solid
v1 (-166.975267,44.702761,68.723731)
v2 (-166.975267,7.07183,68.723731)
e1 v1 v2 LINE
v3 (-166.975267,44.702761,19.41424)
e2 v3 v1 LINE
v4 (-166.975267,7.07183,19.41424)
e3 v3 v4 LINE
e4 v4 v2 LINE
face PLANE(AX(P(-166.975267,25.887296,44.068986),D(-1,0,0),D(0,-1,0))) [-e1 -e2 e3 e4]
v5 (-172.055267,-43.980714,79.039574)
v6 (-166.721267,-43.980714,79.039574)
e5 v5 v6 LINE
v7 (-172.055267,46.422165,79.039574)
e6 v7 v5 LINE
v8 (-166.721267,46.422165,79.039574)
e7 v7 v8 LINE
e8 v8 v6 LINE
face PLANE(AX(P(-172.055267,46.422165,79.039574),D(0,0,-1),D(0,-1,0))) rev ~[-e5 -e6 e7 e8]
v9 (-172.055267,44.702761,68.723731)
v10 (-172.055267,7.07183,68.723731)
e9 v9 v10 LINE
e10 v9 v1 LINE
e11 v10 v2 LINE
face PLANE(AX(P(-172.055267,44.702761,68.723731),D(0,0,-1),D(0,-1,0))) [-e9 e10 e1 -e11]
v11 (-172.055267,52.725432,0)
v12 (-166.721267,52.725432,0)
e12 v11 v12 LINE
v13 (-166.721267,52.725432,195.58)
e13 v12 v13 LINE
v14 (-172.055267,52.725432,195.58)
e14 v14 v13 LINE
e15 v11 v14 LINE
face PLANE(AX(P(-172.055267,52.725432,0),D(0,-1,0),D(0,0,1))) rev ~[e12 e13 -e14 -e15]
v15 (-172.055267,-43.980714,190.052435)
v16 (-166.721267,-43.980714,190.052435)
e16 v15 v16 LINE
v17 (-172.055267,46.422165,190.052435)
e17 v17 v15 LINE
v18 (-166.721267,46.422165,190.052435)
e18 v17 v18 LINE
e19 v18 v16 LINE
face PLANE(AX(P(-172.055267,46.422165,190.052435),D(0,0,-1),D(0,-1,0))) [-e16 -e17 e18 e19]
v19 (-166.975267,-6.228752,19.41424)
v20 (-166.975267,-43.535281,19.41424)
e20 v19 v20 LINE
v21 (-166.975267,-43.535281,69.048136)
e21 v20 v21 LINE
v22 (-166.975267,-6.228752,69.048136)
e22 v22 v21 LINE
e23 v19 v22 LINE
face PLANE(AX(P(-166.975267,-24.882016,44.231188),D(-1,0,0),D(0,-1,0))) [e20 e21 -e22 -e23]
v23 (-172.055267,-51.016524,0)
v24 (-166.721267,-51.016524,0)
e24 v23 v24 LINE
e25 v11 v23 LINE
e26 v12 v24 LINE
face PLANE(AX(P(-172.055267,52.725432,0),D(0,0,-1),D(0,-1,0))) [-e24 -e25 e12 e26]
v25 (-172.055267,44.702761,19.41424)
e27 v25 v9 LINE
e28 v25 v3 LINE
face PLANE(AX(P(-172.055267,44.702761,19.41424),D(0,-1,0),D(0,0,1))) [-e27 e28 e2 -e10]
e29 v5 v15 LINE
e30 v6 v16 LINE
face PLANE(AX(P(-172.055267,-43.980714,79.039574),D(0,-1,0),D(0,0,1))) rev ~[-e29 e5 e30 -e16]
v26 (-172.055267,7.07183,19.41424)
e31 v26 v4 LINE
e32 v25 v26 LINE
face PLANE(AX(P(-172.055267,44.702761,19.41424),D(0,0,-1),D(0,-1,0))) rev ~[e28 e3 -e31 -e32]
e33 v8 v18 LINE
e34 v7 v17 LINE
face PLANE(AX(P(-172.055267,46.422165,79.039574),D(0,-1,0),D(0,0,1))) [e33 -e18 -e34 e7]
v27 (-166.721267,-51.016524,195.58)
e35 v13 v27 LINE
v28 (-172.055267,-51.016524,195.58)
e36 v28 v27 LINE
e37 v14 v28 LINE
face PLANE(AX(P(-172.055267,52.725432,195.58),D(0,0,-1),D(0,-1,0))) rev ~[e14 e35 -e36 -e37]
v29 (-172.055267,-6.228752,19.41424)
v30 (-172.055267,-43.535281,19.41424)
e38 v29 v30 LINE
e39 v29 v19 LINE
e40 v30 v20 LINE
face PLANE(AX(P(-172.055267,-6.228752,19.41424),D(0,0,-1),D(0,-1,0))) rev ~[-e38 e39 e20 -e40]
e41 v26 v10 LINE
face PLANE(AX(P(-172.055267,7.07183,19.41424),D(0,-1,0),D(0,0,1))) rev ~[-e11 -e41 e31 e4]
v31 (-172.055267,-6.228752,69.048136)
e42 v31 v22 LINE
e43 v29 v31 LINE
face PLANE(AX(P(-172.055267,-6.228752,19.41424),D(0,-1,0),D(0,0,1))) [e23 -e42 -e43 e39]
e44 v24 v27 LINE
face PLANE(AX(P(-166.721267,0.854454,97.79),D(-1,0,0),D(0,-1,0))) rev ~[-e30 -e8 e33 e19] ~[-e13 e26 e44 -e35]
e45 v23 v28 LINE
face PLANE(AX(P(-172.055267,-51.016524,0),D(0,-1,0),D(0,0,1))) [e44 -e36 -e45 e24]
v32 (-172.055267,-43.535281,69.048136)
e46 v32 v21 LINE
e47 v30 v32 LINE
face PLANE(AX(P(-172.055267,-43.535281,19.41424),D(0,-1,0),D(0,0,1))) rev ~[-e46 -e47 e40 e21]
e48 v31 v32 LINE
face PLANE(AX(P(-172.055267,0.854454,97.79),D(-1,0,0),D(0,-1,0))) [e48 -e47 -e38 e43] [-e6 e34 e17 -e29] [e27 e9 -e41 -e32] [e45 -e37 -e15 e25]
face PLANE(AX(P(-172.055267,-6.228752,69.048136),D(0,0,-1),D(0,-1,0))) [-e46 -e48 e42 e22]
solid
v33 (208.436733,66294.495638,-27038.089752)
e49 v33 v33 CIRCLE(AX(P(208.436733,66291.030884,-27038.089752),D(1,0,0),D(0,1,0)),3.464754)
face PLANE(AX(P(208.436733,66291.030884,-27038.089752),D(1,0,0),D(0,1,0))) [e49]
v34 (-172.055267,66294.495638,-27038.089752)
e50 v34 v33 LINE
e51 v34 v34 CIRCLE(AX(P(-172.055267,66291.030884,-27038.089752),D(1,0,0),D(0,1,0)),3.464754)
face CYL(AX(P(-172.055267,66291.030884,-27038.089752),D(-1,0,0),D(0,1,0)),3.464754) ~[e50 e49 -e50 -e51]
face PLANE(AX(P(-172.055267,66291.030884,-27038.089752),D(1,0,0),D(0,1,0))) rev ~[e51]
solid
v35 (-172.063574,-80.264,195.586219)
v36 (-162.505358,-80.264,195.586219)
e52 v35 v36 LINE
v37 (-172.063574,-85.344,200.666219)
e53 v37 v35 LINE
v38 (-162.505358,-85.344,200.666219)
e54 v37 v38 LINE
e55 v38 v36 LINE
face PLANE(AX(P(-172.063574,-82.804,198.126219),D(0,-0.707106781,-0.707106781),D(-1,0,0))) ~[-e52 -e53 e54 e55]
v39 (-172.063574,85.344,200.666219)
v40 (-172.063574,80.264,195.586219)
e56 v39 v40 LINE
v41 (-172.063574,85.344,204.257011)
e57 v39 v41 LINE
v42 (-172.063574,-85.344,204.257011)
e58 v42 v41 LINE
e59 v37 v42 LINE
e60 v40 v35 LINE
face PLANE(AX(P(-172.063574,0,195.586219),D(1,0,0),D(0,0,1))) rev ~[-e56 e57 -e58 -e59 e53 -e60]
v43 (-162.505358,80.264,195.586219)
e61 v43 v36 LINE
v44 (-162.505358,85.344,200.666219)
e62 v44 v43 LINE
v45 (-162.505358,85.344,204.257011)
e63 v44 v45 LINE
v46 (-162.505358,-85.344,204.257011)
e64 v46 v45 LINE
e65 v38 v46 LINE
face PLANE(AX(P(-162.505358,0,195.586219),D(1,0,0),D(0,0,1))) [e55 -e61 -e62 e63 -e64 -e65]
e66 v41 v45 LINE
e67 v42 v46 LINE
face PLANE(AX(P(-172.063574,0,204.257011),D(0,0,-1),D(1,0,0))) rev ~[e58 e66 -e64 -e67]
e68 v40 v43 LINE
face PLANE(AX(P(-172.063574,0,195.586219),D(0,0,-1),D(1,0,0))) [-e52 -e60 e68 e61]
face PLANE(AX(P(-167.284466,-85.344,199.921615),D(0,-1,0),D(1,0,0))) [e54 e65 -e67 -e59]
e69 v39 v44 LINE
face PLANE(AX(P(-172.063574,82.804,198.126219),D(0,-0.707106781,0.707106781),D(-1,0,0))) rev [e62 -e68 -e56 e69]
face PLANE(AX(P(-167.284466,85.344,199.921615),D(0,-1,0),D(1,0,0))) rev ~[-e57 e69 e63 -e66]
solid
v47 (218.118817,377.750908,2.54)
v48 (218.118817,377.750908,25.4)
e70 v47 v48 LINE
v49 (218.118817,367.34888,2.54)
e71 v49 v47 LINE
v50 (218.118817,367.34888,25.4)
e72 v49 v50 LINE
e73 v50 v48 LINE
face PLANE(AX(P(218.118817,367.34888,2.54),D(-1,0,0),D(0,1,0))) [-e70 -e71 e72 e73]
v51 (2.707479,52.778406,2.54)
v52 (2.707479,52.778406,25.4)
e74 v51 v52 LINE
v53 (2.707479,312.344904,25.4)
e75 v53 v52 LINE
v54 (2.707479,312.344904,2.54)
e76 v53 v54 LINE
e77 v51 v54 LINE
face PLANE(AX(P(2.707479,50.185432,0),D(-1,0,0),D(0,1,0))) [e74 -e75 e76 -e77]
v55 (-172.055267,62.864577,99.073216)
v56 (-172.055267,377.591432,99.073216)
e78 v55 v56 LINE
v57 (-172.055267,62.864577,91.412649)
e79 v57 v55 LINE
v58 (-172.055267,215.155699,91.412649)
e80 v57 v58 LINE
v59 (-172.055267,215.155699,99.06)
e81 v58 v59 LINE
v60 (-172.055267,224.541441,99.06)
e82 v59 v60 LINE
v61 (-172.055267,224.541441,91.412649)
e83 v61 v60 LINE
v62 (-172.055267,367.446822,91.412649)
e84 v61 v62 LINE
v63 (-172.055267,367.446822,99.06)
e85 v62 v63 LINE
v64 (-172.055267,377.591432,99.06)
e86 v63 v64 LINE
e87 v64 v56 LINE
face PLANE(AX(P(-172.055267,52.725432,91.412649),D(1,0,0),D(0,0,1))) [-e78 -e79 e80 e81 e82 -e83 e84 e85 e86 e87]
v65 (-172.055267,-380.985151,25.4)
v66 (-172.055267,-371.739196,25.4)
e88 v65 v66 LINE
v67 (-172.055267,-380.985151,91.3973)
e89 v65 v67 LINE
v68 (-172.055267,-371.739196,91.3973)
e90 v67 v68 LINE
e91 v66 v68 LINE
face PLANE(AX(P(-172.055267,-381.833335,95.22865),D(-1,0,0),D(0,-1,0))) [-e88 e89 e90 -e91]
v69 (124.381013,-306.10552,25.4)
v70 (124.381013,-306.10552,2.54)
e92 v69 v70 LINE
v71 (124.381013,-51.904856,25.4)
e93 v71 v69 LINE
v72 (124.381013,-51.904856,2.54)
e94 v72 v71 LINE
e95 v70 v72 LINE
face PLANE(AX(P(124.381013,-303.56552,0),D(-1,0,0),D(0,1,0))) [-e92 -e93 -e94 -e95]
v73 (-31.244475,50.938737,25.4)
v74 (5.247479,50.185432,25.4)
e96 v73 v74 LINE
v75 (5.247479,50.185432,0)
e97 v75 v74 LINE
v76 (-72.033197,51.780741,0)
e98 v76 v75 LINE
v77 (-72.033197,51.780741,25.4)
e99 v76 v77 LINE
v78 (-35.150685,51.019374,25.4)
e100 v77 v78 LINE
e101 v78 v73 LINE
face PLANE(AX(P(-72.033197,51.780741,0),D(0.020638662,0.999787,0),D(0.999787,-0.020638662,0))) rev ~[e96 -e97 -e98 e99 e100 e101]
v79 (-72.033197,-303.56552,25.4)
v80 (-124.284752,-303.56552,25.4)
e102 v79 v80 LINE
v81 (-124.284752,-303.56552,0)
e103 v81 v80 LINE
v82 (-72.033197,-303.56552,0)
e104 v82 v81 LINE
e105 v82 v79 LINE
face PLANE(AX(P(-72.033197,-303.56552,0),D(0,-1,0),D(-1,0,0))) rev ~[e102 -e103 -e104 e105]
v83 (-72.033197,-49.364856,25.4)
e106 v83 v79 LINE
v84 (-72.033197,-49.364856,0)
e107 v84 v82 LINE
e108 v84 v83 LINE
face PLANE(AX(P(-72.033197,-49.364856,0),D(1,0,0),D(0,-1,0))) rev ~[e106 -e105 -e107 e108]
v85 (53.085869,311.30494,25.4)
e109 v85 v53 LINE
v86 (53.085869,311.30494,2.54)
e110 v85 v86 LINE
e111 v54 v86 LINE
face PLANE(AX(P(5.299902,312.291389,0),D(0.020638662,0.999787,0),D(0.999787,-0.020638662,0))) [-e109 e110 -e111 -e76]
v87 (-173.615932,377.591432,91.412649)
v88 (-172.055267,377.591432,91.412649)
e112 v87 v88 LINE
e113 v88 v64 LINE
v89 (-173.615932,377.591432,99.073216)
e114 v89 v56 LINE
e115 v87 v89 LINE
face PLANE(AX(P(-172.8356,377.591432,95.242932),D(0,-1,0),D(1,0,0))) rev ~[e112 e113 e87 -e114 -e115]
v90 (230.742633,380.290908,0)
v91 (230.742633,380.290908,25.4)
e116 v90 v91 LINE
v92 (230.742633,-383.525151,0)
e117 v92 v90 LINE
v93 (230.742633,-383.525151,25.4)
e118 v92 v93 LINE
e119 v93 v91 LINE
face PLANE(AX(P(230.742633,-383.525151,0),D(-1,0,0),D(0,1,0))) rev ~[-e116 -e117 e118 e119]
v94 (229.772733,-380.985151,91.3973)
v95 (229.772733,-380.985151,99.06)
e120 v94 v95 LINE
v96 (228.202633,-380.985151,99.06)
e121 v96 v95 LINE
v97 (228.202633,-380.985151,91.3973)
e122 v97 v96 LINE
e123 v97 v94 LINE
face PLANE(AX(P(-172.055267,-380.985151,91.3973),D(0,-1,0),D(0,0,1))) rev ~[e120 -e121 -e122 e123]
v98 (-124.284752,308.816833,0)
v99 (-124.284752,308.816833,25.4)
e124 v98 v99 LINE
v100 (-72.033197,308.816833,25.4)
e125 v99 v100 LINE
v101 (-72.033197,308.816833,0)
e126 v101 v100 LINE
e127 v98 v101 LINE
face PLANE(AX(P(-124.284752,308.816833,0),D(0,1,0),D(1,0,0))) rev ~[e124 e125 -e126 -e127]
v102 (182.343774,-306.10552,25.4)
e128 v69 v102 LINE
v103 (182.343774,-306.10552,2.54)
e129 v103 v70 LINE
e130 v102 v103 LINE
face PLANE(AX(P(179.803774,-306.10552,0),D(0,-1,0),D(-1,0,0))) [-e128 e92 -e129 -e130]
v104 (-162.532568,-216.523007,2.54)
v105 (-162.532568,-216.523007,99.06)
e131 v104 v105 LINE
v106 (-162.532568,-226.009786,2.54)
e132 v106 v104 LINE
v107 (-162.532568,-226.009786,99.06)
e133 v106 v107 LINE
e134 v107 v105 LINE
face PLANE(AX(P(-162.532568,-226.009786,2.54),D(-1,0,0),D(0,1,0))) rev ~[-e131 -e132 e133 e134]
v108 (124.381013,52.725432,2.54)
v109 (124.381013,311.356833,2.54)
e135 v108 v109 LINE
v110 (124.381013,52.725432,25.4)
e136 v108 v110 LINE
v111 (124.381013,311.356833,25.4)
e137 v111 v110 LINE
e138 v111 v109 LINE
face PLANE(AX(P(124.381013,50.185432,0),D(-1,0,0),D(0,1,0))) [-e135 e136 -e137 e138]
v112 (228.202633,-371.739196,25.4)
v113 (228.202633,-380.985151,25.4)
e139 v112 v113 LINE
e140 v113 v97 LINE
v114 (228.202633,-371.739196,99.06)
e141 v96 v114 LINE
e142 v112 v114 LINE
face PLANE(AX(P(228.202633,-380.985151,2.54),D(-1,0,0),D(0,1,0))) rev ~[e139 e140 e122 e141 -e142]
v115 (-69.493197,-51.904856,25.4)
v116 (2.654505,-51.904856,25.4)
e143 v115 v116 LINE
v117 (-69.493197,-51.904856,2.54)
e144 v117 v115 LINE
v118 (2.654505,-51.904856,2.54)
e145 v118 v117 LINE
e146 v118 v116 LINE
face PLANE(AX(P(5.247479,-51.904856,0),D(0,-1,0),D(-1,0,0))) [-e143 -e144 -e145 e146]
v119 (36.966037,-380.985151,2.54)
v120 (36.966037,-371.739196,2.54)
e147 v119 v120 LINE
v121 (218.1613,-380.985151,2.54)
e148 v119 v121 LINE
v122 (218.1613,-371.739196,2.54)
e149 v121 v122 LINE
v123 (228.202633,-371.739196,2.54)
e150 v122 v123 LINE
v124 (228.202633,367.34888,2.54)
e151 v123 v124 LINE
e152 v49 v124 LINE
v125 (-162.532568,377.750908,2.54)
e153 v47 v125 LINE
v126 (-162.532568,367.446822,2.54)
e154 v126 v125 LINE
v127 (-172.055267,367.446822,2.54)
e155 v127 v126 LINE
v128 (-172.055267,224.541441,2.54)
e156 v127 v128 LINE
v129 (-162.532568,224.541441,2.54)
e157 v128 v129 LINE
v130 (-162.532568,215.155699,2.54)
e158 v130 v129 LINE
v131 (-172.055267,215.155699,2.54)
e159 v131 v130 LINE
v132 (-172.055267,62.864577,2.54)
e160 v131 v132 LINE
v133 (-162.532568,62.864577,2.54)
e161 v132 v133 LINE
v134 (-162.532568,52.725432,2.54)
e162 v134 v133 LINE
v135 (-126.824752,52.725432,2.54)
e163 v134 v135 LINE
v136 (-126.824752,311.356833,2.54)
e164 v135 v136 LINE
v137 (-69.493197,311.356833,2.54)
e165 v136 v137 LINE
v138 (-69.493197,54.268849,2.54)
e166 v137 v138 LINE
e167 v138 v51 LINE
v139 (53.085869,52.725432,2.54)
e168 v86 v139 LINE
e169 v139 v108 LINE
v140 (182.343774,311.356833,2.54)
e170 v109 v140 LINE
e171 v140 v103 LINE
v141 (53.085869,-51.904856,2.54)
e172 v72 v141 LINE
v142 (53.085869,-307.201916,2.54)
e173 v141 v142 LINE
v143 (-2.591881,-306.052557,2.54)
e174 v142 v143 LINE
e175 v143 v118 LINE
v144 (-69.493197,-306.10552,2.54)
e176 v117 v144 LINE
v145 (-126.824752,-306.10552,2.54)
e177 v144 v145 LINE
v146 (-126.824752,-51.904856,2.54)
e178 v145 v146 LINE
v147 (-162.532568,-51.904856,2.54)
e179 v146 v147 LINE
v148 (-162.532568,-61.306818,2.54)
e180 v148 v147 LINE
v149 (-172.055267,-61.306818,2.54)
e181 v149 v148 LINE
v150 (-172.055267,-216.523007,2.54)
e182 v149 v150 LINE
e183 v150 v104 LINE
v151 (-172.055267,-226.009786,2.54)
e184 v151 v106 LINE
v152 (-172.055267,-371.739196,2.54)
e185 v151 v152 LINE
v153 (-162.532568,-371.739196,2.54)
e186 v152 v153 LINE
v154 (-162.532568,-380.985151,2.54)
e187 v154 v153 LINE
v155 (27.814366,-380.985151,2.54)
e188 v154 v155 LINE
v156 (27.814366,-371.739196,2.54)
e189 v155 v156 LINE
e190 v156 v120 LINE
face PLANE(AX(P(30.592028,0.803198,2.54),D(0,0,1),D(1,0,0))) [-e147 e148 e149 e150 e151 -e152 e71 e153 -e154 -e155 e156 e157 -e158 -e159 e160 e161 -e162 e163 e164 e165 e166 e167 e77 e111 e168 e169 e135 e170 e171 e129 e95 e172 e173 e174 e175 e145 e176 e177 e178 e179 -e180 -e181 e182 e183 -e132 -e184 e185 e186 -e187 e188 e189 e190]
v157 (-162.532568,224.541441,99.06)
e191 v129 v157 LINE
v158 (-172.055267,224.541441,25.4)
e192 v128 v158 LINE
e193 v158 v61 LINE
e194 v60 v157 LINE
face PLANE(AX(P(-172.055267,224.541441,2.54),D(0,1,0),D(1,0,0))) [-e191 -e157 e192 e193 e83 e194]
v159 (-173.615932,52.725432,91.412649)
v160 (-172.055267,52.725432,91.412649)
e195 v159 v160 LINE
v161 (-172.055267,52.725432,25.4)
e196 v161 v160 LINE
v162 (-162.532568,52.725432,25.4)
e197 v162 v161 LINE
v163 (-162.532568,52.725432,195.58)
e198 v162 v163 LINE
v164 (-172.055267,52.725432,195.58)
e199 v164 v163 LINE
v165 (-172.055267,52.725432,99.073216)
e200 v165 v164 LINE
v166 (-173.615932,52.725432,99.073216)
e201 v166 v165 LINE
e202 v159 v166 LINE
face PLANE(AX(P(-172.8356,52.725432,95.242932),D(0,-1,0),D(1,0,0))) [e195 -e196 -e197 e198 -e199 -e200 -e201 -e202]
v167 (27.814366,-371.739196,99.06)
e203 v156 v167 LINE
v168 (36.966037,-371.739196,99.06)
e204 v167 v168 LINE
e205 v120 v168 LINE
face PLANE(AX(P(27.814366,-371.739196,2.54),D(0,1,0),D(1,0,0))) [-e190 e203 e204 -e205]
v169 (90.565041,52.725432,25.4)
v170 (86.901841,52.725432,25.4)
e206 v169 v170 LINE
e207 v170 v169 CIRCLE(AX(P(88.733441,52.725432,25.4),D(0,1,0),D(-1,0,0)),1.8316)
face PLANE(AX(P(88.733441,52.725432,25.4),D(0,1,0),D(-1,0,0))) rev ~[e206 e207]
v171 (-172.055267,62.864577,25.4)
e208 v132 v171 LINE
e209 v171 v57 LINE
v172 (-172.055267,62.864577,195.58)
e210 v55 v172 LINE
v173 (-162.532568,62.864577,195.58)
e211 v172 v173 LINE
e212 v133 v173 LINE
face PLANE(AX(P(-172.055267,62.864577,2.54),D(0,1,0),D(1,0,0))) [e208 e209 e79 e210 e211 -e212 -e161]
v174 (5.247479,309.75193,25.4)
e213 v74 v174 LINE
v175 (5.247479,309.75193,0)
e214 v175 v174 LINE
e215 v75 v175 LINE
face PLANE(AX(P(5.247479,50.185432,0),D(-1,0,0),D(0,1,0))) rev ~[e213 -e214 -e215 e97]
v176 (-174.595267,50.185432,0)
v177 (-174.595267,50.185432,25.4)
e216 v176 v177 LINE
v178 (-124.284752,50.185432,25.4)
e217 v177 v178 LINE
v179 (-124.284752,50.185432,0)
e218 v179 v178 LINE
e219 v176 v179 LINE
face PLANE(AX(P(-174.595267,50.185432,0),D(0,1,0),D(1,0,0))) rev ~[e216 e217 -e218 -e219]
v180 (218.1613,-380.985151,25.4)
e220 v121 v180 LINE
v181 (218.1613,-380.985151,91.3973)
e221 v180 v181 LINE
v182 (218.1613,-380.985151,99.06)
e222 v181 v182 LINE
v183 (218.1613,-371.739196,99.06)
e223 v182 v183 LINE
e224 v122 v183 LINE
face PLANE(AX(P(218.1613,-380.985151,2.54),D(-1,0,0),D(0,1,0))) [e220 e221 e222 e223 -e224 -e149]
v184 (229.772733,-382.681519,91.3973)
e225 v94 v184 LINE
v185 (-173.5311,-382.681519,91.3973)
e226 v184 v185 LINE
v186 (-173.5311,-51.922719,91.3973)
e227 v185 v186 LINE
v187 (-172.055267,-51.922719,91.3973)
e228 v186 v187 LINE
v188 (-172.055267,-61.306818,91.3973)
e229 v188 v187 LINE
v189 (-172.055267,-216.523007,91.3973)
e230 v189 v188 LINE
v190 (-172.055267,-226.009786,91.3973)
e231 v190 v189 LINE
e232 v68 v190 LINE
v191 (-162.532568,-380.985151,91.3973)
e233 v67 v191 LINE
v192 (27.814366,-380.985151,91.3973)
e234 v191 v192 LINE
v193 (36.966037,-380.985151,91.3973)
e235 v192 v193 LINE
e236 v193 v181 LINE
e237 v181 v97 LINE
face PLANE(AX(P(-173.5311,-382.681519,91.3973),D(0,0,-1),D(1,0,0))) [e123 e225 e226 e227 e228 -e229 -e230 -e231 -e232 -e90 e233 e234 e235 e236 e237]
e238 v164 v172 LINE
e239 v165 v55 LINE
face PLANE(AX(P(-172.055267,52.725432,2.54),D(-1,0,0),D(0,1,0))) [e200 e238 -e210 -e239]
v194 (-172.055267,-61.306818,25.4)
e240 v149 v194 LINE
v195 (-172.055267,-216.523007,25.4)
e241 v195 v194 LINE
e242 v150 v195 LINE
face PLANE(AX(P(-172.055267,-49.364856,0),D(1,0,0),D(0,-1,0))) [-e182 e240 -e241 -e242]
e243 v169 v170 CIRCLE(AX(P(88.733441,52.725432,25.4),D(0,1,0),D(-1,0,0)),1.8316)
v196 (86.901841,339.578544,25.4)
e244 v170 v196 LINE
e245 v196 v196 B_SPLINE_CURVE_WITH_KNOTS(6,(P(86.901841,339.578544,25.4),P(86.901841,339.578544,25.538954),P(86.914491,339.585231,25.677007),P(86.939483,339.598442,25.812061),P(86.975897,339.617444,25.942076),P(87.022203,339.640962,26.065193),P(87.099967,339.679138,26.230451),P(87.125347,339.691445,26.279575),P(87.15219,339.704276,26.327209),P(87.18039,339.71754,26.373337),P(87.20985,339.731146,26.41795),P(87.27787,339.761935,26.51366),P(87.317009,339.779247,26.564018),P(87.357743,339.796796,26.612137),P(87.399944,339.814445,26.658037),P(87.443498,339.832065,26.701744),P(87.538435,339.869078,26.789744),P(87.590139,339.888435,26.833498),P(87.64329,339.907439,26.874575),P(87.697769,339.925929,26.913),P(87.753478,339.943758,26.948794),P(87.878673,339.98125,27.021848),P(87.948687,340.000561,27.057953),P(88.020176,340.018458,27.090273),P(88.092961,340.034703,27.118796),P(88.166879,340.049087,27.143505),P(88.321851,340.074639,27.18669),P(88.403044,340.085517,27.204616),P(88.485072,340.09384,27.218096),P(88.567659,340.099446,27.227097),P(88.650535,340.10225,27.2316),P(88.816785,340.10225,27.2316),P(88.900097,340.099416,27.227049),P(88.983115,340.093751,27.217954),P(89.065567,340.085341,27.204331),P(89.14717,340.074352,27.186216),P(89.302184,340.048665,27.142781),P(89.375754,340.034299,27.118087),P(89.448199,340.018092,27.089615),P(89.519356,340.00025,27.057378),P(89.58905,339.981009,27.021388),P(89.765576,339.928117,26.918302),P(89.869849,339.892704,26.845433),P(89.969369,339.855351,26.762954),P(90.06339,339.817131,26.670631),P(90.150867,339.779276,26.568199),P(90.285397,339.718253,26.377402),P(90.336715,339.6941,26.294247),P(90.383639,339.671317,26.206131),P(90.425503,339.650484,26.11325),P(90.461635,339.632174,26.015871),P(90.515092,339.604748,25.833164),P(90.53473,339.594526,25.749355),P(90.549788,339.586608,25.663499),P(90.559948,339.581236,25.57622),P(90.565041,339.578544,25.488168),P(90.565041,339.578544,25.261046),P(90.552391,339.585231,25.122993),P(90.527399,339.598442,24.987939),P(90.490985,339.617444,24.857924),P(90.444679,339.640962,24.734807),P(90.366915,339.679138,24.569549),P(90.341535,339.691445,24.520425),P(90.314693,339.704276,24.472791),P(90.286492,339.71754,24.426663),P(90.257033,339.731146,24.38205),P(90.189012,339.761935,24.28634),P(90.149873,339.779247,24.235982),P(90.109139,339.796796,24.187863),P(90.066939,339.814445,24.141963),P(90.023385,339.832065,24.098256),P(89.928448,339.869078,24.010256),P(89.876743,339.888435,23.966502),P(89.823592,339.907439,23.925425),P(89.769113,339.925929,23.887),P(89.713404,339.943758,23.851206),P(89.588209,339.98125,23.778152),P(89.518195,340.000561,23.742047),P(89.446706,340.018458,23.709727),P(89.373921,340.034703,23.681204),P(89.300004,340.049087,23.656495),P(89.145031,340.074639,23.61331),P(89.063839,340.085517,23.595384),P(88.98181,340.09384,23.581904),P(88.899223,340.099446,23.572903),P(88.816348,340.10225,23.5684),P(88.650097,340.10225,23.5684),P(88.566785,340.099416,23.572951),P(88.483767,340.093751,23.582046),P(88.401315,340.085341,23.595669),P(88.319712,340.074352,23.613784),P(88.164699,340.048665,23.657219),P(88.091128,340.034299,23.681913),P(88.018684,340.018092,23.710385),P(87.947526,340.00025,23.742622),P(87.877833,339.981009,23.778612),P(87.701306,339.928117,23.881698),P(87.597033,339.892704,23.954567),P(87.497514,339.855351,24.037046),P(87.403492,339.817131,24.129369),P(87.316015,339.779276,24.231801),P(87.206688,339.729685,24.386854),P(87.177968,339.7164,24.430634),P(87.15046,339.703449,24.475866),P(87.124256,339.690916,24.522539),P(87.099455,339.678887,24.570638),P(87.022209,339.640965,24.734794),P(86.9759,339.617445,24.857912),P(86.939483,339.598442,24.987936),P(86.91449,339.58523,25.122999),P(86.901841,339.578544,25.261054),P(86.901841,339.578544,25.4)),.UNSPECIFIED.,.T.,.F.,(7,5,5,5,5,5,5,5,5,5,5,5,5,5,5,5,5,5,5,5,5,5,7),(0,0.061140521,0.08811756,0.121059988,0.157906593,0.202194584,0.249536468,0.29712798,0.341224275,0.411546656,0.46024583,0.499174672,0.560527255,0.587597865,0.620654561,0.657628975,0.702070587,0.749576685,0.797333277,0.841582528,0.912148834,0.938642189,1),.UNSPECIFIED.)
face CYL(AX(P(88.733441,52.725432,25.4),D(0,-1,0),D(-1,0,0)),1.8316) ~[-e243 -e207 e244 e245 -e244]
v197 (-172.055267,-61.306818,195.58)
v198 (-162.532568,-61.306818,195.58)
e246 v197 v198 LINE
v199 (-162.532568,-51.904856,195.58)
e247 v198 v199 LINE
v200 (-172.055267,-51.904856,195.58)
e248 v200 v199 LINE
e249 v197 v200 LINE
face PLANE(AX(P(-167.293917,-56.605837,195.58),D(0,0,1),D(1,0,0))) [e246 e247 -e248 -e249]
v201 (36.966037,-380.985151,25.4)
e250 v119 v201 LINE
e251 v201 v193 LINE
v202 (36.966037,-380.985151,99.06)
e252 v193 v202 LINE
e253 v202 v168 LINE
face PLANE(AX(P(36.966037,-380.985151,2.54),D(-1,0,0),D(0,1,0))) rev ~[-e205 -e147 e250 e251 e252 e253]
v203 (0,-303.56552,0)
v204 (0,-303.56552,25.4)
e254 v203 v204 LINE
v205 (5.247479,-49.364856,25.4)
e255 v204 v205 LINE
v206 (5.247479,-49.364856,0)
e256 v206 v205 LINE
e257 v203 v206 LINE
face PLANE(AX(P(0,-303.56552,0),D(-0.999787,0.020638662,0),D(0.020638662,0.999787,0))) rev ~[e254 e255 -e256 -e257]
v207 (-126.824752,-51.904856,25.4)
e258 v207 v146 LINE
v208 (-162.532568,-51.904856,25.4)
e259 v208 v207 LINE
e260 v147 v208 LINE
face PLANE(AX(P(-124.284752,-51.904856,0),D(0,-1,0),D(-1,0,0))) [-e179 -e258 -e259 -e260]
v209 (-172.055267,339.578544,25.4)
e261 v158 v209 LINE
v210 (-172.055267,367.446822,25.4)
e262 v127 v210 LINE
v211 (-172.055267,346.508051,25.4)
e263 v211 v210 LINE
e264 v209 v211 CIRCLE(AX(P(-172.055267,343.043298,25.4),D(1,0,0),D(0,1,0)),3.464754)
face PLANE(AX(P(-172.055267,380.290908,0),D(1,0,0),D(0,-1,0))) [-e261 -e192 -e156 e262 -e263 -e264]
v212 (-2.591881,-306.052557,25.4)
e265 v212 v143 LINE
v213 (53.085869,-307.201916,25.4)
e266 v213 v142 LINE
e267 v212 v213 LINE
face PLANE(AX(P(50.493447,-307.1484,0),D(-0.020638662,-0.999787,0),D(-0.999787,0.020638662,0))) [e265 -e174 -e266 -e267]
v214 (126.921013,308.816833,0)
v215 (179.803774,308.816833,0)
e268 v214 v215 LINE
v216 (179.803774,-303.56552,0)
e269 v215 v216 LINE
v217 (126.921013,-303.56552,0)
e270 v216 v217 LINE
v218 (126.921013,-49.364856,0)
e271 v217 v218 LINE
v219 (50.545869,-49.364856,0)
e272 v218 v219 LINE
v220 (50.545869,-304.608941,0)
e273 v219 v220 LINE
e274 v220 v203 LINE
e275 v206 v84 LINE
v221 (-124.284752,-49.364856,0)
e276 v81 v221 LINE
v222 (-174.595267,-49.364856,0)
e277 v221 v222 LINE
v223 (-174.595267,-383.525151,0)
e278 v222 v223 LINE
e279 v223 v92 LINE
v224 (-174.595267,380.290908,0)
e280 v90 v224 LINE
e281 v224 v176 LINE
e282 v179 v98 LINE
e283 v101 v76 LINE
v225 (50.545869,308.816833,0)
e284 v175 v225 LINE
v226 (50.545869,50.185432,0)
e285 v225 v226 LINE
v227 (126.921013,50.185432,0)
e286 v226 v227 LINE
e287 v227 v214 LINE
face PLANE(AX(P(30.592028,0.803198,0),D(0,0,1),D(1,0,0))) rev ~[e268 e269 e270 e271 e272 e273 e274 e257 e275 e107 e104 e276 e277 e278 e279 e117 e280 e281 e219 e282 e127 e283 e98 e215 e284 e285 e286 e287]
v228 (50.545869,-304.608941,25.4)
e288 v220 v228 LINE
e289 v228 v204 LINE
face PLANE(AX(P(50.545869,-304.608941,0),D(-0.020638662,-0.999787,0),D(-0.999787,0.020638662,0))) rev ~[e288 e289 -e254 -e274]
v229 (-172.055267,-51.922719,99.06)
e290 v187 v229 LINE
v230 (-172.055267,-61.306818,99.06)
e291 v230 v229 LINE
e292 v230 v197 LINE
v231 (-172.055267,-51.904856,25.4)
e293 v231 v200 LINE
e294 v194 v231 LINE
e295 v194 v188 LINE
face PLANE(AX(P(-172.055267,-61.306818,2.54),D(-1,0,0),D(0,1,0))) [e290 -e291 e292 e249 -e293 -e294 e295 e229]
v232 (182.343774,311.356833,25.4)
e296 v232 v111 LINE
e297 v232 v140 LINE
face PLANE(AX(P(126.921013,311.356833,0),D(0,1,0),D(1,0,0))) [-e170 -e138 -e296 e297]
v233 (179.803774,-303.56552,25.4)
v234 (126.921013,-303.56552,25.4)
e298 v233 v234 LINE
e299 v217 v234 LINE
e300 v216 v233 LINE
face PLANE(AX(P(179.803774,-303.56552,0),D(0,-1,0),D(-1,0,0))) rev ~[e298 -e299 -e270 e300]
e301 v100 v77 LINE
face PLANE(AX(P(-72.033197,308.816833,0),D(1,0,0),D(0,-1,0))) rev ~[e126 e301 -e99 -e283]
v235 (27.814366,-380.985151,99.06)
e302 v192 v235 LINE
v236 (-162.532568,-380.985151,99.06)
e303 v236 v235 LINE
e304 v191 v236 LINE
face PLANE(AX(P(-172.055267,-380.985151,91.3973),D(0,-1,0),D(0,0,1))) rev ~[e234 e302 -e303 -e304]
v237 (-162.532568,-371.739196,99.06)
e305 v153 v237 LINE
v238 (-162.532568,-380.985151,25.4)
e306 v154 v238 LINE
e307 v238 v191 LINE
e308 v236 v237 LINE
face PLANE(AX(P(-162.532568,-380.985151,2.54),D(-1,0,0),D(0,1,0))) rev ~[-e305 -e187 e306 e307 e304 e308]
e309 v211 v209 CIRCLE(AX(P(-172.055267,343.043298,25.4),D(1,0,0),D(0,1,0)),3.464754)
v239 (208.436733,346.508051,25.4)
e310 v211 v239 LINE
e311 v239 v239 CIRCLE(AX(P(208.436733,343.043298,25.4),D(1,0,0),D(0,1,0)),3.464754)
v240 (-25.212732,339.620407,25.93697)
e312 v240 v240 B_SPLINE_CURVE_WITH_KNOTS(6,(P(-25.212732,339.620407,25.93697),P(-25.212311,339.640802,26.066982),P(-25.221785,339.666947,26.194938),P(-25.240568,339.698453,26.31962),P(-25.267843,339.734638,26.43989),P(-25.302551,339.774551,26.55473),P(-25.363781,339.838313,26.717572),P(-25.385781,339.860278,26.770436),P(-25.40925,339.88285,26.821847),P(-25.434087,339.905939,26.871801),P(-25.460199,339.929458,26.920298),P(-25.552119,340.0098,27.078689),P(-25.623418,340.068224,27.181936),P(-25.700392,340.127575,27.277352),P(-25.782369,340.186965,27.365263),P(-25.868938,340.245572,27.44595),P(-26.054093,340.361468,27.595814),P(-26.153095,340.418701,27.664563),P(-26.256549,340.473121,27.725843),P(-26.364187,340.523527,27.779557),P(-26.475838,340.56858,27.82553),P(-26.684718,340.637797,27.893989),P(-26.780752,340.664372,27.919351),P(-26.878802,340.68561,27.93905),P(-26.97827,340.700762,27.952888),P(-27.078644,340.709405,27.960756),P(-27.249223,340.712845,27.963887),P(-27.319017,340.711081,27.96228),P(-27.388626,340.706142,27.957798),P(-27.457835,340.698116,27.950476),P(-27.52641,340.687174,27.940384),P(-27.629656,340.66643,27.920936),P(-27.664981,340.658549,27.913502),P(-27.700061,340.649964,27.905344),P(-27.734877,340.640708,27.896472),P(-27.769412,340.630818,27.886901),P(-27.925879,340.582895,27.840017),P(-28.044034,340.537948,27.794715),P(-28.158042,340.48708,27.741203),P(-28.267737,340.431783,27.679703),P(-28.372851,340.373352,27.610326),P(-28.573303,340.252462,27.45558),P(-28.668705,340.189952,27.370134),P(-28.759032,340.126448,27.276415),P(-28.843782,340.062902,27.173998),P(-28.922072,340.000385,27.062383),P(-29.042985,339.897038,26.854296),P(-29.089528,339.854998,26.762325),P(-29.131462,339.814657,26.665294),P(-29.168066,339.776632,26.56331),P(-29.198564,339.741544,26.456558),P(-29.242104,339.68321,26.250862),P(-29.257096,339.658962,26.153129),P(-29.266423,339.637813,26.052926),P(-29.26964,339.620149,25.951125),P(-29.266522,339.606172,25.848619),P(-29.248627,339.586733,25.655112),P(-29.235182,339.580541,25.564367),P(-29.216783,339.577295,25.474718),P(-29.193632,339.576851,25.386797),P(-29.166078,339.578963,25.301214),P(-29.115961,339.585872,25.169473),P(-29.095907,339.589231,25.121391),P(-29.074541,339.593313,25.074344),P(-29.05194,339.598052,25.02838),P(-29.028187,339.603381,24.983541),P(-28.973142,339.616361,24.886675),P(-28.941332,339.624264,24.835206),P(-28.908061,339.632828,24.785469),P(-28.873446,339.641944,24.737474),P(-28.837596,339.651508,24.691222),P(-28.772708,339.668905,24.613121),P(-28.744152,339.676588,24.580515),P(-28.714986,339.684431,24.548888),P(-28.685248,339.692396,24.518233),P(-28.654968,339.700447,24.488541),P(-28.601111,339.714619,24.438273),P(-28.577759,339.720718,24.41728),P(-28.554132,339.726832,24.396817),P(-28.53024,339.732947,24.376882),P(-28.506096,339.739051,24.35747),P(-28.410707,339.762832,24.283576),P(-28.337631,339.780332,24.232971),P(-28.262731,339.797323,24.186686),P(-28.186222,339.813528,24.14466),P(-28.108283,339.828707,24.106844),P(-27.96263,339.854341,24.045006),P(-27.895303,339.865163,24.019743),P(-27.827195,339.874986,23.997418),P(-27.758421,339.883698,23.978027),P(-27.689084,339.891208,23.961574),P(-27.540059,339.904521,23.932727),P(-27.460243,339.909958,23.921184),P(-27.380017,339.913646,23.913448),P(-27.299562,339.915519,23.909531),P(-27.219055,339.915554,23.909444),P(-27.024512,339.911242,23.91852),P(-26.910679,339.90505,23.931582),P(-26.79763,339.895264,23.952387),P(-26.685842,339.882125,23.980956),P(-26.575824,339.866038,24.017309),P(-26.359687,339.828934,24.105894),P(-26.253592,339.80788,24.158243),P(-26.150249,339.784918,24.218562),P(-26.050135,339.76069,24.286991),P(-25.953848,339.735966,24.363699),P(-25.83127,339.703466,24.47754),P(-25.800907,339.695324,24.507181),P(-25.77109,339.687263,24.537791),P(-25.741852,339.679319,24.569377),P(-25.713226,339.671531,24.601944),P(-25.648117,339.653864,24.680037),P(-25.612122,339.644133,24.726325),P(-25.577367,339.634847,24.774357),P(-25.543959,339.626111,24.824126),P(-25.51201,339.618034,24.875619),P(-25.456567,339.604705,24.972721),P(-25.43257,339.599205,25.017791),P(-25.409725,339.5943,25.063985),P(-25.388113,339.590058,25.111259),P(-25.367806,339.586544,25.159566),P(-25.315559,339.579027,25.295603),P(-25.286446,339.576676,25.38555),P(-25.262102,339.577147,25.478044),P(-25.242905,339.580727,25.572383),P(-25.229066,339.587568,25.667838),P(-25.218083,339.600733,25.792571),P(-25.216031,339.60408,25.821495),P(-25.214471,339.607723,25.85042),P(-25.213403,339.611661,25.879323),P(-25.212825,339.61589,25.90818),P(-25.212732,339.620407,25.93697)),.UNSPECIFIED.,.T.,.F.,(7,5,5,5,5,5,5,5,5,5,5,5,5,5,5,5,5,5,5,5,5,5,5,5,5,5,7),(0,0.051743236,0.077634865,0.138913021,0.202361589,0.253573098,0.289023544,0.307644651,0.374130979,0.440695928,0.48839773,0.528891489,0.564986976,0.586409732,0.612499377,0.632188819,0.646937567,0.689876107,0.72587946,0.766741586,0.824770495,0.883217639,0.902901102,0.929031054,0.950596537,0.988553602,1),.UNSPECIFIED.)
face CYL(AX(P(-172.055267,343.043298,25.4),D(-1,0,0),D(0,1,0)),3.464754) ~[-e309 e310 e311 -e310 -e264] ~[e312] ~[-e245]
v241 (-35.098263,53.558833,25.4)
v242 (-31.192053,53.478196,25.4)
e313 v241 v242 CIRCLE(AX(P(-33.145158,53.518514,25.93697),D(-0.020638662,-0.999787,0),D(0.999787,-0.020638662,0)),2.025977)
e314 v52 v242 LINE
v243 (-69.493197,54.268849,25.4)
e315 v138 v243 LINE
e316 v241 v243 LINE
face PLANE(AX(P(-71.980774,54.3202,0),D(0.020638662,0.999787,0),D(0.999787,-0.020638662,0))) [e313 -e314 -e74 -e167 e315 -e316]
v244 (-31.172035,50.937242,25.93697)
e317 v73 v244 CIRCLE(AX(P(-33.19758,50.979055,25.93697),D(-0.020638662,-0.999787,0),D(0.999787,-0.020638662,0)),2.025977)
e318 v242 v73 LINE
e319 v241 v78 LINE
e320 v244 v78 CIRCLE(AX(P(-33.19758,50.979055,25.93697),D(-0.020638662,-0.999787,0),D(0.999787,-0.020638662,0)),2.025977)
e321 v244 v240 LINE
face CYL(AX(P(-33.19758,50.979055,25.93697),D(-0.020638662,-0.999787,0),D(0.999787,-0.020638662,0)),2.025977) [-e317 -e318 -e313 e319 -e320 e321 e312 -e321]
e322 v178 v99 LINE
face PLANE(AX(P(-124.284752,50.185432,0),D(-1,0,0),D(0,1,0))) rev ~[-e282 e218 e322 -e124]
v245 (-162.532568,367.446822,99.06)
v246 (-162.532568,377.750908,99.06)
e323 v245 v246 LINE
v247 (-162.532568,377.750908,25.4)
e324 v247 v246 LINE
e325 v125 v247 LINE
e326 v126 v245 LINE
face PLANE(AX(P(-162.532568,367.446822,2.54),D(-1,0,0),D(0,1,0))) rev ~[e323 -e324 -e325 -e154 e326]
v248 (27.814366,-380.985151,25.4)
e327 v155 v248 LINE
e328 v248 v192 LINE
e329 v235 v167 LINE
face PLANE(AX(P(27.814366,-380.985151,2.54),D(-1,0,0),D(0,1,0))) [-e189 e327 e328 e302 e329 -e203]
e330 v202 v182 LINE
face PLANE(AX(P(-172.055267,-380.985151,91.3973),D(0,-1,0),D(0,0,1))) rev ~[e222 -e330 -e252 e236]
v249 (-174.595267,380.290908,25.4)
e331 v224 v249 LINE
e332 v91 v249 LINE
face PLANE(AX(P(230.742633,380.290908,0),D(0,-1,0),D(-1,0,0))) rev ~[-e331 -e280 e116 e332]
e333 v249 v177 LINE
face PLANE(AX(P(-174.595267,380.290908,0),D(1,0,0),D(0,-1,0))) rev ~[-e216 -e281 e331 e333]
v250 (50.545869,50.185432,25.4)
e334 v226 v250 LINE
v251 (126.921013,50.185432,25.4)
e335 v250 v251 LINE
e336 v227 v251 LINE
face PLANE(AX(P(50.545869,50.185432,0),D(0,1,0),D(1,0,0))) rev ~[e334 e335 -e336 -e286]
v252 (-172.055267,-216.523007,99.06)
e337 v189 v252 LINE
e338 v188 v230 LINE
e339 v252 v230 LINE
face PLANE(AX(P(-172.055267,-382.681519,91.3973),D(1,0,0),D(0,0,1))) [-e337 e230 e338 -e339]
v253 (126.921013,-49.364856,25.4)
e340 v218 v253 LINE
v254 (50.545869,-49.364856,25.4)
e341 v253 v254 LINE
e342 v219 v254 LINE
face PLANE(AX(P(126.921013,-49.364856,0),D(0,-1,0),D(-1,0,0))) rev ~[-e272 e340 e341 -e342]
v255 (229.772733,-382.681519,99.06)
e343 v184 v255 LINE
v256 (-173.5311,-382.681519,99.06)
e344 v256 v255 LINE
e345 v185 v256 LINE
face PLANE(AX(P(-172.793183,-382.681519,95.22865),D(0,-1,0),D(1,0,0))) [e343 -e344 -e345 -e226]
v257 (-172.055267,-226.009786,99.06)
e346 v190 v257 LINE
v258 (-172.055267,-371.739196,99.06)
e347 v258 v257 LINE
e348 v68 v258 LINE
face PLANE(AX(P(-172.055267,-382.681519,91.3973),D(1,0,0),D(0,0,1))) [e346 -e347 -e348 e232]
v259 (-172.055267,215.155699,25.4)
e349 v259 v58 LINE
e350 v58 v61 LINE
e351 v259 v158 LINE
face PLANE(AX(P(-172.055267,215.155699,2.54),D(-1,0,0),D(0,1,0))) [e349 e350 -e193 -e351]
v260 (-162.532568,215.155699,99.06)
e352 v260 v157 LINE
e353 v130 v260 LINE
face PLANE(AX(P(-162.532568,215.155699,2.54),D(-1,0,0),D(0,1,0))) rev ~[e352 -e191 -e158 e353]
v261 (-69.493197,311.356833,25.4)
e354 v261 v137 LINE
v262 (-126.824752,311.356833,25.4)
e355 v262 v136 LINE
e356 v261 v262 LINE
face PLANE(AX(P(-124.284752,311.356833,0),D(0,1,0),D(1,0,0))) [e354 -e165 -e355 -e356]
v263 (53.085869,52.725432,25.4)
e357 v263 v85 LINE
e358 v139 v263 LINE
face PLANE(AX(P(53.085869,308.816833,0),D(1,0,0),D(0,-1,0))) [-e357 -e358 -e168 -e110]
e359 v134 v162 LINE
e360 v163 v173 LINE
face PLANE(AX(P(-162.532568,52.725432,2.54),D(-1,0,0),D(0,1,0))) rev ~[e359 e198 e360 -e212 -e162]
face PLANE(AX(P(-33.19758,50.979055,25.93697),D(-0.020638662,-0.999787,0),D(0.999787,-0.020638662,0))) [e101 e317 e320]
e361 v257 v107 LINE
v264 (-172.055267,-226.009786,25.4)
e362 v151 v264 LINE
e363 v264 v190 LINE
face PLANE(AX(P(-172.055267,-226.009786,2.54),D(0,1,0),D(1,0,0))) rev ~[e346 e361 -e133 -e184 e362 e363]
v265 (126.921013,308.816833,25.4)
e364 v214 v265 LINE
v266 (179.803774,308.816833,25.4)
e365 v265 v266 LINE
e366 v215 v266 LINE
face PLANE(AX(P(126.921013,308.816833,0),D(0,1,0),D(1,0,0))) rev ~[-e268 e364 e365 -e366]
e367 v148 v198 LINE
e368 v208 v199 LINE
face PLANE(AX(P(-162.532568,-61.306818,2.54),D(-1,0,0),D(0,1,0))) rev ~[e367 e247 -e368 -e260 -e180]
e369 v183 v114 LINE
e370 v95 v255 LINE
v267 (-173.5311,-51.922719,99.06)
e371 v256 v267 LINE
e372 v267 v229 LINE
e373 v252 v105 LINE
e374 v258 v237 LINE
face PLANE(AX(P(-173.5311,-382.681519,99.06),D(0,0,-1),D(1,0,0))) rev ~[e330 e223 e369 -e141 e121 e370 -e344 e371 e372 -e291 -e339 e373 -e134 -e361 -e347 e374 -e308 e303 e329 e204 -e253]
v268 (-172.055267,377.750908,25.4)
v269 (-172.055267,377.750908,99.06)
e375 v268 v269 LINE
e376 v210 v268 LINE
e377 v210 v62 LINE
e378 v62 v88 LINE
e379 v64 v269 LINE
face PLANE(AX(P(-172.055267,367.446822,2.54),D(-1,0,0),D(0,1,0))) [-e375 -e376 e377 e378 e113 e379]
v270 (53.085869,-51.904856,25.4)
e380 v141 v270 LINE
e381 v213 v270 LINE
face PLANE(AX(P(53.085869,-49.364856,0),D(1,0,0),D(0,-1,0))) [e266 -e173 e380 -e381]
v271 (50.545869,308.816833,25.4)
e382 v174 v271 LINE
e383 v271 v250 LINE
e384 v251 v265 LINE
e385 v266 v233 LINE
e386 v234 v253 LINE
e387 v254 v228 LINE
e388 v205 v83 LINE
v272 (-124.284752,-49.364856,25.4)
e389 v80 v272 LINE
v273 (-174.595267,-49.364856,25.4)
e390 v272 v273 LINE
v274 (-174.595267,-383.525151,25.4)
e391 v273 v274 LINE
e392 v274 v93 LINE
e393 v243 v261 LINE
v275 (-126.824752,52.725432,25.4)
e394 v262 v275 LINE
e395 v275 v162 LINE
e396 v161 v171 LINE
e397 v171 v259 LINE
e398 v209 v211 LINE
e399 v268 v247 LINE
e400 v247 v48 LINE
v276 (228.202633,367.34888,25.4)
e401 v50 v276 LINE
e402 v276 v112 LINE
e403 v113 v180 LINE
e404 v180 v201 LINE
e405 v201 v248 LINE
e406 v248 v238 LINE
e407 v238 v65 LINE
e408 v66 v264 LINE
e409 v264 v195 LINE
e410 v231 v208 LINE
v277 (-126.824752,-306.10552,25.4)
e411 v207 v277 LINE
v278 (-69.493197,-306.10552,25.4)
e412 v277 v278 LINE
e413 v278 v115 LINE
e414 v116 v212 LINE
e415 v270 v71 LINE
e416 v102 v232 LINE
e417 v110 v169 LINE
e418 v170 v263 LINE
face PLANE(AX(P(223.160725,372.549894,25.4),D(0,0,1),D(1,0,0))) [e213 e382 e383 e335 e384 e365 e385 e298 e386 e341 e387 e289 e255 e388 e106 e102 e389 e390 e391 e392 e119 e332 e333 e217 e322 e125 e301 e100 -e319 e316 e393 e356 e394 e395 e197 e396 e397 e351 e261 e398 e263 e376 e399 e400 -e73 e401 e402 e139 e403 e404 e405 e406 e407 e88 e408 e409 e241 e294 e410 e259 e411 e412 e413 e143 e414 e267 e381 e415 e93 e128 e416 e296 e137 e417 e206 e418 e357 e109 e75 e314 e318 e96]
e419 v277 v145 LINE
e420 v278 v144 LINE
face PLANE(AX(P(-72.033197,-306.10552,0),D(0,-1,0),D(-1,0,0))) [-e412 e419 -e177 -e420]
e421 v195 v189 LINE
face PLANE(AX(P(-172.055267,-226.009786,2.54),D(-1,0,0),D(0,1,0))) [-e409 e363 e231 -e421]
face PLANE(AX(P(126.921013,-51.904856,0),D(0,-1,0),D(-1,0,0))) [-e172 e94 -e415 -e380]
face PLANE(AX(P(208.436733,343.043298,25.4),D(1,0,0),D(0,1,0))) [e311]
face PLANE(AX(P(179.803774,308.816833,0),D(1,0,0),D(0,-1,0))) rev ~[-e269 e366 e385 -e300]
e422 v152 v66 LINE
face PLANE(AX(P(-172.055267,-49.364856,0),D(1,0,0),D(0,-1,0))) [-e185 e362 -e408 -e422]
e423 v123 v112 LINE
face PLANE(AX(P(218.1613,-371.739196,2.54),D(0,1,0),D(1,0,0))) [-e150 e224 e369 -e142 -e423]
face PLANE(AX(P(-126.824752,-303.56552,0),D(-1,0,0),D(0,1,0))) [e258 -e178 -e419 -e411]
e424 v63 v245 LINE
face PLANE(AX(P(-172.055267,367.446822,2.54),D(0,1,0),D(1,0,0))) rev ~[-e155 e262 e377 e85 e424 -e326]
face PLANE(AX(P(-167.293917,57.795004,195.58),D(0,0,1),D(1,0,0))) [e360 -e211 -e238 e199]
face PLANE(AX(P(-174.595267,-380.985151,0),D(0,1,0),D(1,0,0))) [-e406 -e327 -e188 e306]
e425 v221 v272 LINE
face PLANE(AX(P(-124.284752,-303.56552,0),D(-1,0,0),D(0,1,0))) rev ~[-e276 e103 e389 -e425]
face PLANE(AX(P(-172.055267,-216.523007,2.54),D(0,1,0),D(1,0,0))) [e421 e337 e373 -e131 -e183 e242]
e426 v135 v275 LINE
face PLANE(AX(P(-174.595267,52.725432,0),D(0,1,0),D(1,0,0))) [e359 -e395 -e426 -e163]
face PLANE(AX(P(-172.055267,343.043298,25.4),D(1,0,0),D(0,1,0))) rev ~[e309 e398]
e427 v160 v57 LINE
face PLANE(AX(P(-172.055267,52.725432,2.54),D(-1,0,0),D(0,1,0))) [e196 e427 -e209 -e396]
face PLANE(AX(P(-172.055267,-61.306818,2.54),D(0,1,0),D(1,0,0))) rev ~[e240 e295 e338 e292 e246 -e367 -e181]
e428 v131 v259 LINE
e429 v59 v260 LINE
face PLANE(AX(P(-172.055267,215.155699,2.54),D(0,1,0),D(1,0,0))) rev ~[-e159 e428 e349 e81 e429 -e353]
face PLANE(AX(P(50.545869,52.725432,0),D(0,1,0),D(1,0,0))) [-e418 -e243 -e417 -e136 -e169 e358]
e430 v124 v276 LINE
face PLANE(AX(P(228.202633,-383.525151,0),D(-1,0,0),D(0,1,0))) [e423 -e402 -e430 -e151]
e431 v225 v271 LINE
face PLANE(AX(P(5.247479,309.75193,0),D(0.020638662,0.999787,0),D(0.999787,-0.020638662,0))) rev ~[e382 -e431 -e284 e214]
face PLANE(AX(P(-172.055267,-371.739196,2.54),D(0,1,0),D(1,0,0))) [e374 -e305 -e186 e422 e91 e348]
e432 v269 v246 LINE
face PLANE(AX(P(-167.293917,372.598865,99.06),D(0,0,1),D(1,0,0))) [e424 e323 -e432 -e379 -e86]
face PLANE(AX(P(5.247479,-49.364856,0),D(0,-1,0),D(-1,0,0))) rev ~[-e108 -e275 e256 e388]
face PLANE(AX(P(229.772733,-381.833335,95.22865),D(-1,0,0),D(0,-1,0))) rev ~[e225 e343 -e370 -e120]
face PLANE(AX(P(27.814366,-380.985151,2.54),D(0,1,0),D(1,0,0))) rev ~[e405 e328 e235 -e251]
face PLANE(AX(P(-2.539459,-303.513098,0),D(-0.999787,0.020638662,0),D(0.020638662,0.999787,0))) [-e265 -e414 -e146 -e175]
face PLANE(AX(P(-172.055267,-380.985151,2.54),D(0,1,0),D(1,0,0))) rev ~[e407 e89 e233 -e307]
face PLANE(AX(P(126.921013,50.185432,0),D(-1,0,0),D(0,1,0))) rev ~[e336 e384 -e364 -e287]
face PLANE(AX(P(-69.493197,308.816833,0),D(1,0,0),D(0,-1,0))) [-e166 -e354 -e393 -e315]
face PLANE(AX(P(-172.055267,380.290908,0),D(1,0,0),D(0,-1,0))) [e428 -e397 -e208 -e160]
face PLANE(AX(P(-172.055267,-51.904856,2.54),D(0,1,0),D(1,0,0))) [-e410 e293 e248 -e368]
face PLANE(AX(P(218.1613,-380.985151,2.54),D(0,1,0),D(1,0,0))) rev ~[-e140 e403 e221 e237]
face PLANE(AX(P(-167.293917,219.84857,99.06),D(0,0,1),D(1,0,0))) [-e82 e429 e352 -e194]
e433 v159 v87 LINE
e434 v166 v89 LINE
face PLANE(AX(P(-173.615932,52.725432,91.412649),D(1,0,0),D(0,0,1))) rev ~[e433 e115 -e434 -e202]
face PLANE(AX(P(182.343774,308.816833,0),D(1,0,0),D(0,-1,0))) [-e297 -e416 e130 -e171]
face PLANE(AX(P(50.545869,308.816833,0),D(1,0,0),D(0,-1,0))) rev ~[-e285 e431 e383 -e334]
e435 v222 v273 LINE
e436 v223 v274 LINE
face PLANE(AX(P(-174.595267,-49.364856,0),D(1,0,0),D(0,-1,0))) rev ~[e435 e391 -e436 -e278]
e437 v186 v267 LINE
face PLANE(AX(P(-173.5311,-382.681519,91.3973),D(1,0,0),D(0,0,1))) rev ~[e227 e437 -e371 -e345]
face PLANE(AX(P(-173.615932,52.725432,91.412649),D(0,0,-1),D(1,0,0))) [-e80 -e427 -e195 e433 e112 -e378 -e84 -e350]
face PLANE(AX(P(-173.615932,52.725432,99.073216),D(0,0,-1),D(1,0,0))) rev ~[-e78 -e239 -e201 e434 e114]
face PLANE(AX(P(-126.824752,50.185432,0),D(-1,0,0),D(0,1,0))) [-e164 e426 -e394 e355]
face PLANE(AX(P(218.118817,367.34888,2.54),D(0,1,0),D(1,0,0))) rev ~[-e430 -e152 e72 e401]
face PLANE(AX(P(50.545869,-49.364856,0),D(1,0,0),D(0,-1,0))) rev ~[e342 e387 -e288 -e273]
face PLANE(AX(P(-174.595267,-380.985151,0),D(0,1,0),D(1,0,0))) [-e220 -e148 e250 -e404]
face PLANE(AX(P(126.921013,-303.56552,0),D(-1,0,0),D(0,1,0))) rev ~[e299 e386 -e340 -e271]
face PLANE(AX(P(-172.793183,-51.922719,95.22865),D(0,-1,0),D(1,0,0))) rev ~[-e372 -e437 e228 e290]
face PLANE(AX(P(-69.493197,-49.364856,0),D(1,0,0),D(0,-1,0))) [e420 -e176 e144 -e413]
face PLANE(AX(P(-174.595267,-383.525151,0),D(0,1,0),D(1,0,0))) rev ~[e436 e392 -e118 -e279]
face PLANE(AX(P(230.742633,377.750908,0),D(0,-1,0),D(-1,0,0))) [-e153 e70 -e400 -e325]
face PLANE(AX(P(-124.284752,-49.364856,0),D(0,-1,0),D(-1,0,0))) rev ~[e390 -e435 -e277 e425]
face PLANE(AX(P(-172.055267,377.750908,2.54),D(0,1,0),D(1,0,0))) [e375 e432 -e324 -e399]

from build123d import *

# Parameters (mm, degrees)
F1_DEPTH  = 25.4
F2_T      = -2.54
F3_W      = 9.5226986027
F3_H      = 10.3040856934
F3_H_2    = 9.245954237
F3_W_2    = 10.041333518
F4_DEPTH  = 96.52
F5_W      = 9.5226986027
F5_H      = 10.1391447401
F5_H_2    = 9.4019619441
F6_DEPTH  = 193.04
F7_W      = 9.5582157373
F7_H      = 8.6707919836
F9_DEPTH  = 85.344
F10_SIZE  = 5.08
F11_W     = 10.0838167286
F11_H     = 10.4020283642
F12_DEPTH = 22.86
F13_W     = 1.6963680973
F13_H     = 7.6626996374
F14_DEPTH = 401.828
F15_W     = 1.4758335733
F15_H     = 7.6626996374
F16_DEPTH = 330.7588
F17_W     = 1.560665884
F17_H     = 7.6605677605
F18_DEPTH = 324.866
F19_W     = 9.5226986027
F19_H     = 9.3857411835
F19_H_2   = 9.4867787715
F19_W_2   = 9.1516710818
F19_H_3   = 9.245954237
F20_DEPTH = 96.52
F21_W     = 103.7419562926
F21_H     = 195.58
F22_DEPTH = 5.334
F23_W     = 90.4028788209
F23_H     = 111.0128611326
F24_DEPTH = 7.366
F25_W     = 37.6309305429
F25_H     = 49.3094902486
F25_W_2   = 37.3065290041
F25_H_2   = 49.6338959783
F26_DEPTH = 5.08
F29_R     = 2.0259765458
F30_DEPTH = 291.592
F31_R     = 3.4647538712
F32_DEPTH = 380.492
F33_R     = 1.8315999193
F34_DEPTH = 290.322


# Not quite as in the source:
# - the program builds the solid bodies; features that only make, move or delete a surface that nothing else refers to are left out


with BuildPart() as f1:
    # F0 (on Top) → F1 (new body)
    with BuildSketch(Plane.XY):
        Polygon((-124.2847517133, -35.648856312), (-174.5952665806, -35.648856312), (-174.5952665806, -369.8091506958), (230.7426333427, -369.8091506958), (230.7426333427, 394.0069079399), (-174.5952665806, 394.0069079399), (-174.5952665806, 63.9014318585), (-124.2847517133, 63.9014318585), (-124.2847517133, 322.5328326225), (-72.0331966877, 322.5328326225), (-72.0331966877, 65.4967414162), (5.2474793047, 63.9014318585), (5.2474793047, 323.4679299602), (50.5458692184, 322.5328326225), (50.5458692184, 63.9014318585), (126.9210129976, 63.9014318585), (126.9210129976, 322.5328326225), (179.8037737608, 322.5328326225), (179.8037737608, -289.8495197296), (126.9210129976, -289.8495197296), (126.9210129976, -35.648856312), (50.5458692184, -35.648856312), (50.5458692184, -290.8929410925), (0, -289.8495197296), (5.2474793047, -35.648856312), (-72.0331966877, -35.648856312), (-72.0331966877, -289.8495197296), (-124.2847517133, -289.8495197296), align=None)
    extrude(amount=F1_DEPTH)

    # F2
    f2_openings = [f1.faces().sort_by_distance(p)[0] for p in [
        (-132.931796, -162.749188, 25.4),
    ]]
    offset(amount=F2_T, openings=f2_openings, kind=Kind.INTERSECTION)

    # F3 (on face) → F4 (join)
    with BuildSketch(Plane.XY.offset(2.54)):
        with Locations((-167.2939172792, 386.3148650932)):
            Rectangle(F3_W, F3_H)
        with Locations((-167.2939172792, -362.6461735773)):
            Rectangle(F3_W, F3_H_2)
        with Locations((223.1819665837, -362.6461735773)):
            Rectangle(F3_W_2, F3_H_2)
    extrude(amount=F4_DEPTH)

    # F5 (on face) → F6 (join)
    with BuildSketch(Plane.XY.offset(2.54)):
        with Locations((-167.2939172792, 71.5110042286)):
            Rectangle(F5_W, F5_H)
        with Locations((-167.2939172792, -42.8898372841)):
            Rectangle(F5_W, F5_H_2)
    extrude(amount=F6_DEPTH)


with BuildPart() as f1_1:
    # F8: moved
    add(f1.part.moved(Location((0, -13.716, 0))))

    # F11 (on face) → F12 (join)
    with BuildSketch(Plane.XY.offset(2.54)):
        with Locations((223.1607249784, 372.5498937578)):
            Rectangle(F11_W, F11_H)
    extrude(amount=F12_DEPTH)

    # F13 (on face) → F14 (join)
    with BuildSketch(Plane(origin=(-172.0552665806, 0, 0), x_dir=(0, -1, 0), z_dir=(-1, 0, 0))):
        with Locations((381.8333347445, 95.2286501813)):
            Rectangle(F13_W, F13_H)
    extrude(amount=-F14_DEPTH)

    # F15 (on face) → F16 (join)
    with BuildSketch(Plane.XZ.offset(382.6815187931)):
        with Locations((-172.7931833673, 95.2286501813)):
            Rectangle(F15_W, F15_H)
    extrude(amount=-F16_DEPTH)

    # F17 (on face) → F18 (join)
    with BuildSketch(Plane.XZ.offset(-52.7254318585)):
        with Locations((-172.8355995226, 95.2429324389)):
            Rectangle(F17_W, F17_H)
    extrude(amount=-F18_DEPTH)

    # F19 (on face) → F20 (join)
    with BuildSketch(Plane.XY.offset(2.54)):
        with Locations((-167.2939172792, 219.8485700144)):
            Rectangle(F19_W, F19_H)
        with Locations((-167.2939172792, -221.2663967432)):
            Rectangle(F19_W, F19_H_2)
        with Locations((32.3902014643, -376.3621735773)):
            Rectangle(F19_W_2, F19_H_3)
    extrude(amount=F20_DEPTH)

    # F29 (on face) → F30 (join)
    with BuildSketch(Plane(origin=(1.0377747393, 50.2723330385, 0), x_dir=(0.9997870001, -0.0206386621, 0), z_dir=(-0.0206386621, -0.9997870001, 0))):
        with Locations((-34.2426486313, 25.9369704872)):
            Circle(F29_R)
    extrude(amount=-F30_DEPTH)

    # F31 (on face) → F32 (join)
    with BuildSketch(Plane.YZ.offset(-172.0552665806)):
        with Locations((343.0432975292, 25.4)):
            Circle(F31_R)
    extrude(amount=F32_DEPTH)

    # F33 (on face) → F34 (join)
    with BuildSketch(Plane(origin=(0, 52.7254318585, 0), x_dir=(-1, 0, 0), z_dir=(0, 1, 0))):
        with Locations((-88.733441108, 25.4)):
            Circle(F33_R)
    extrude(amount=F34_DEPTH)


with BuildPart() as f9:
    # F7 (on Front) → F9 (new body, symmetric)
    with BuildSketch(Plane.XZ):
        with Locations((-167.2844663262, 199.9216154218)):
            Rectangle(F7_W, F7_H)
    extrude(amount=F9_DEPTH, both=True)

    # F10
    f10_edges = [f9.edges().sort_by_distance(p)[0] for p in [
        (-167.284466, 85.344, 195.586219),
        (-167.284466, -85.344, 195.586219),
    ]]
    chamfer(f10_edges, length=F10_SIZE)


with BuildPart() as f22:
    # F21 (on face) → F22 (new body)
    with BuildSketch(Plane(origin=(-172.0552665806, 0, 0), x_dir=(0, -1, 0), z_dir=(-1, 0, 0))):
        with Locations((-0.8544537122, 97.79)):
            Rectangle(F21_W, F21_H)
    extrude(amount=-F22_DEPTH)

    # F23 (on face) → F24 (cut)
    with BuildSketch(Plane(origin=(-172.0552665806, 0, 0), x_dir=(0, -1, 0), z_dir=(-1, 0, 0))):
        with Locations((-1.2207254767, 134.5460042357)):
            Rectangle(F23_W, F23_H)
    extrude(amount=-F24_DEPTH, mode=Mode.SUBTRACT)

    # F25 (on face) → F26 (cut)
    with BuildSketch(Plane(origin=(-172.0552665806, 0, 0), x_dir=(0, -1, 0), z_dir=(-1, 0, 0))):
        with Locations((-25.8872956038, 44.0689856187)):
            Rectangle(F25_W, F25_H)
        with Locations((24.8820164707, 44.2311884835)):
            Rectangle(F25_W_2, F25_H_2)
    extrude(amount=-F26_DEPTH, mode=Mode.SUBTRACT)


with BuildPart() as f32:
    # F31 (on face) → F32, piece 2 (new body)
    with BuildSketch(Plane.YZ.offset(-172.0552665806)):
        with Locations((66291.0308837891, -27038.0897521973)):
            Circle(F31_R)
    extrude(amount=F32_DEPTH)


solid = Compound([f1_1.part, f9.part, f22.part, f32.part])
